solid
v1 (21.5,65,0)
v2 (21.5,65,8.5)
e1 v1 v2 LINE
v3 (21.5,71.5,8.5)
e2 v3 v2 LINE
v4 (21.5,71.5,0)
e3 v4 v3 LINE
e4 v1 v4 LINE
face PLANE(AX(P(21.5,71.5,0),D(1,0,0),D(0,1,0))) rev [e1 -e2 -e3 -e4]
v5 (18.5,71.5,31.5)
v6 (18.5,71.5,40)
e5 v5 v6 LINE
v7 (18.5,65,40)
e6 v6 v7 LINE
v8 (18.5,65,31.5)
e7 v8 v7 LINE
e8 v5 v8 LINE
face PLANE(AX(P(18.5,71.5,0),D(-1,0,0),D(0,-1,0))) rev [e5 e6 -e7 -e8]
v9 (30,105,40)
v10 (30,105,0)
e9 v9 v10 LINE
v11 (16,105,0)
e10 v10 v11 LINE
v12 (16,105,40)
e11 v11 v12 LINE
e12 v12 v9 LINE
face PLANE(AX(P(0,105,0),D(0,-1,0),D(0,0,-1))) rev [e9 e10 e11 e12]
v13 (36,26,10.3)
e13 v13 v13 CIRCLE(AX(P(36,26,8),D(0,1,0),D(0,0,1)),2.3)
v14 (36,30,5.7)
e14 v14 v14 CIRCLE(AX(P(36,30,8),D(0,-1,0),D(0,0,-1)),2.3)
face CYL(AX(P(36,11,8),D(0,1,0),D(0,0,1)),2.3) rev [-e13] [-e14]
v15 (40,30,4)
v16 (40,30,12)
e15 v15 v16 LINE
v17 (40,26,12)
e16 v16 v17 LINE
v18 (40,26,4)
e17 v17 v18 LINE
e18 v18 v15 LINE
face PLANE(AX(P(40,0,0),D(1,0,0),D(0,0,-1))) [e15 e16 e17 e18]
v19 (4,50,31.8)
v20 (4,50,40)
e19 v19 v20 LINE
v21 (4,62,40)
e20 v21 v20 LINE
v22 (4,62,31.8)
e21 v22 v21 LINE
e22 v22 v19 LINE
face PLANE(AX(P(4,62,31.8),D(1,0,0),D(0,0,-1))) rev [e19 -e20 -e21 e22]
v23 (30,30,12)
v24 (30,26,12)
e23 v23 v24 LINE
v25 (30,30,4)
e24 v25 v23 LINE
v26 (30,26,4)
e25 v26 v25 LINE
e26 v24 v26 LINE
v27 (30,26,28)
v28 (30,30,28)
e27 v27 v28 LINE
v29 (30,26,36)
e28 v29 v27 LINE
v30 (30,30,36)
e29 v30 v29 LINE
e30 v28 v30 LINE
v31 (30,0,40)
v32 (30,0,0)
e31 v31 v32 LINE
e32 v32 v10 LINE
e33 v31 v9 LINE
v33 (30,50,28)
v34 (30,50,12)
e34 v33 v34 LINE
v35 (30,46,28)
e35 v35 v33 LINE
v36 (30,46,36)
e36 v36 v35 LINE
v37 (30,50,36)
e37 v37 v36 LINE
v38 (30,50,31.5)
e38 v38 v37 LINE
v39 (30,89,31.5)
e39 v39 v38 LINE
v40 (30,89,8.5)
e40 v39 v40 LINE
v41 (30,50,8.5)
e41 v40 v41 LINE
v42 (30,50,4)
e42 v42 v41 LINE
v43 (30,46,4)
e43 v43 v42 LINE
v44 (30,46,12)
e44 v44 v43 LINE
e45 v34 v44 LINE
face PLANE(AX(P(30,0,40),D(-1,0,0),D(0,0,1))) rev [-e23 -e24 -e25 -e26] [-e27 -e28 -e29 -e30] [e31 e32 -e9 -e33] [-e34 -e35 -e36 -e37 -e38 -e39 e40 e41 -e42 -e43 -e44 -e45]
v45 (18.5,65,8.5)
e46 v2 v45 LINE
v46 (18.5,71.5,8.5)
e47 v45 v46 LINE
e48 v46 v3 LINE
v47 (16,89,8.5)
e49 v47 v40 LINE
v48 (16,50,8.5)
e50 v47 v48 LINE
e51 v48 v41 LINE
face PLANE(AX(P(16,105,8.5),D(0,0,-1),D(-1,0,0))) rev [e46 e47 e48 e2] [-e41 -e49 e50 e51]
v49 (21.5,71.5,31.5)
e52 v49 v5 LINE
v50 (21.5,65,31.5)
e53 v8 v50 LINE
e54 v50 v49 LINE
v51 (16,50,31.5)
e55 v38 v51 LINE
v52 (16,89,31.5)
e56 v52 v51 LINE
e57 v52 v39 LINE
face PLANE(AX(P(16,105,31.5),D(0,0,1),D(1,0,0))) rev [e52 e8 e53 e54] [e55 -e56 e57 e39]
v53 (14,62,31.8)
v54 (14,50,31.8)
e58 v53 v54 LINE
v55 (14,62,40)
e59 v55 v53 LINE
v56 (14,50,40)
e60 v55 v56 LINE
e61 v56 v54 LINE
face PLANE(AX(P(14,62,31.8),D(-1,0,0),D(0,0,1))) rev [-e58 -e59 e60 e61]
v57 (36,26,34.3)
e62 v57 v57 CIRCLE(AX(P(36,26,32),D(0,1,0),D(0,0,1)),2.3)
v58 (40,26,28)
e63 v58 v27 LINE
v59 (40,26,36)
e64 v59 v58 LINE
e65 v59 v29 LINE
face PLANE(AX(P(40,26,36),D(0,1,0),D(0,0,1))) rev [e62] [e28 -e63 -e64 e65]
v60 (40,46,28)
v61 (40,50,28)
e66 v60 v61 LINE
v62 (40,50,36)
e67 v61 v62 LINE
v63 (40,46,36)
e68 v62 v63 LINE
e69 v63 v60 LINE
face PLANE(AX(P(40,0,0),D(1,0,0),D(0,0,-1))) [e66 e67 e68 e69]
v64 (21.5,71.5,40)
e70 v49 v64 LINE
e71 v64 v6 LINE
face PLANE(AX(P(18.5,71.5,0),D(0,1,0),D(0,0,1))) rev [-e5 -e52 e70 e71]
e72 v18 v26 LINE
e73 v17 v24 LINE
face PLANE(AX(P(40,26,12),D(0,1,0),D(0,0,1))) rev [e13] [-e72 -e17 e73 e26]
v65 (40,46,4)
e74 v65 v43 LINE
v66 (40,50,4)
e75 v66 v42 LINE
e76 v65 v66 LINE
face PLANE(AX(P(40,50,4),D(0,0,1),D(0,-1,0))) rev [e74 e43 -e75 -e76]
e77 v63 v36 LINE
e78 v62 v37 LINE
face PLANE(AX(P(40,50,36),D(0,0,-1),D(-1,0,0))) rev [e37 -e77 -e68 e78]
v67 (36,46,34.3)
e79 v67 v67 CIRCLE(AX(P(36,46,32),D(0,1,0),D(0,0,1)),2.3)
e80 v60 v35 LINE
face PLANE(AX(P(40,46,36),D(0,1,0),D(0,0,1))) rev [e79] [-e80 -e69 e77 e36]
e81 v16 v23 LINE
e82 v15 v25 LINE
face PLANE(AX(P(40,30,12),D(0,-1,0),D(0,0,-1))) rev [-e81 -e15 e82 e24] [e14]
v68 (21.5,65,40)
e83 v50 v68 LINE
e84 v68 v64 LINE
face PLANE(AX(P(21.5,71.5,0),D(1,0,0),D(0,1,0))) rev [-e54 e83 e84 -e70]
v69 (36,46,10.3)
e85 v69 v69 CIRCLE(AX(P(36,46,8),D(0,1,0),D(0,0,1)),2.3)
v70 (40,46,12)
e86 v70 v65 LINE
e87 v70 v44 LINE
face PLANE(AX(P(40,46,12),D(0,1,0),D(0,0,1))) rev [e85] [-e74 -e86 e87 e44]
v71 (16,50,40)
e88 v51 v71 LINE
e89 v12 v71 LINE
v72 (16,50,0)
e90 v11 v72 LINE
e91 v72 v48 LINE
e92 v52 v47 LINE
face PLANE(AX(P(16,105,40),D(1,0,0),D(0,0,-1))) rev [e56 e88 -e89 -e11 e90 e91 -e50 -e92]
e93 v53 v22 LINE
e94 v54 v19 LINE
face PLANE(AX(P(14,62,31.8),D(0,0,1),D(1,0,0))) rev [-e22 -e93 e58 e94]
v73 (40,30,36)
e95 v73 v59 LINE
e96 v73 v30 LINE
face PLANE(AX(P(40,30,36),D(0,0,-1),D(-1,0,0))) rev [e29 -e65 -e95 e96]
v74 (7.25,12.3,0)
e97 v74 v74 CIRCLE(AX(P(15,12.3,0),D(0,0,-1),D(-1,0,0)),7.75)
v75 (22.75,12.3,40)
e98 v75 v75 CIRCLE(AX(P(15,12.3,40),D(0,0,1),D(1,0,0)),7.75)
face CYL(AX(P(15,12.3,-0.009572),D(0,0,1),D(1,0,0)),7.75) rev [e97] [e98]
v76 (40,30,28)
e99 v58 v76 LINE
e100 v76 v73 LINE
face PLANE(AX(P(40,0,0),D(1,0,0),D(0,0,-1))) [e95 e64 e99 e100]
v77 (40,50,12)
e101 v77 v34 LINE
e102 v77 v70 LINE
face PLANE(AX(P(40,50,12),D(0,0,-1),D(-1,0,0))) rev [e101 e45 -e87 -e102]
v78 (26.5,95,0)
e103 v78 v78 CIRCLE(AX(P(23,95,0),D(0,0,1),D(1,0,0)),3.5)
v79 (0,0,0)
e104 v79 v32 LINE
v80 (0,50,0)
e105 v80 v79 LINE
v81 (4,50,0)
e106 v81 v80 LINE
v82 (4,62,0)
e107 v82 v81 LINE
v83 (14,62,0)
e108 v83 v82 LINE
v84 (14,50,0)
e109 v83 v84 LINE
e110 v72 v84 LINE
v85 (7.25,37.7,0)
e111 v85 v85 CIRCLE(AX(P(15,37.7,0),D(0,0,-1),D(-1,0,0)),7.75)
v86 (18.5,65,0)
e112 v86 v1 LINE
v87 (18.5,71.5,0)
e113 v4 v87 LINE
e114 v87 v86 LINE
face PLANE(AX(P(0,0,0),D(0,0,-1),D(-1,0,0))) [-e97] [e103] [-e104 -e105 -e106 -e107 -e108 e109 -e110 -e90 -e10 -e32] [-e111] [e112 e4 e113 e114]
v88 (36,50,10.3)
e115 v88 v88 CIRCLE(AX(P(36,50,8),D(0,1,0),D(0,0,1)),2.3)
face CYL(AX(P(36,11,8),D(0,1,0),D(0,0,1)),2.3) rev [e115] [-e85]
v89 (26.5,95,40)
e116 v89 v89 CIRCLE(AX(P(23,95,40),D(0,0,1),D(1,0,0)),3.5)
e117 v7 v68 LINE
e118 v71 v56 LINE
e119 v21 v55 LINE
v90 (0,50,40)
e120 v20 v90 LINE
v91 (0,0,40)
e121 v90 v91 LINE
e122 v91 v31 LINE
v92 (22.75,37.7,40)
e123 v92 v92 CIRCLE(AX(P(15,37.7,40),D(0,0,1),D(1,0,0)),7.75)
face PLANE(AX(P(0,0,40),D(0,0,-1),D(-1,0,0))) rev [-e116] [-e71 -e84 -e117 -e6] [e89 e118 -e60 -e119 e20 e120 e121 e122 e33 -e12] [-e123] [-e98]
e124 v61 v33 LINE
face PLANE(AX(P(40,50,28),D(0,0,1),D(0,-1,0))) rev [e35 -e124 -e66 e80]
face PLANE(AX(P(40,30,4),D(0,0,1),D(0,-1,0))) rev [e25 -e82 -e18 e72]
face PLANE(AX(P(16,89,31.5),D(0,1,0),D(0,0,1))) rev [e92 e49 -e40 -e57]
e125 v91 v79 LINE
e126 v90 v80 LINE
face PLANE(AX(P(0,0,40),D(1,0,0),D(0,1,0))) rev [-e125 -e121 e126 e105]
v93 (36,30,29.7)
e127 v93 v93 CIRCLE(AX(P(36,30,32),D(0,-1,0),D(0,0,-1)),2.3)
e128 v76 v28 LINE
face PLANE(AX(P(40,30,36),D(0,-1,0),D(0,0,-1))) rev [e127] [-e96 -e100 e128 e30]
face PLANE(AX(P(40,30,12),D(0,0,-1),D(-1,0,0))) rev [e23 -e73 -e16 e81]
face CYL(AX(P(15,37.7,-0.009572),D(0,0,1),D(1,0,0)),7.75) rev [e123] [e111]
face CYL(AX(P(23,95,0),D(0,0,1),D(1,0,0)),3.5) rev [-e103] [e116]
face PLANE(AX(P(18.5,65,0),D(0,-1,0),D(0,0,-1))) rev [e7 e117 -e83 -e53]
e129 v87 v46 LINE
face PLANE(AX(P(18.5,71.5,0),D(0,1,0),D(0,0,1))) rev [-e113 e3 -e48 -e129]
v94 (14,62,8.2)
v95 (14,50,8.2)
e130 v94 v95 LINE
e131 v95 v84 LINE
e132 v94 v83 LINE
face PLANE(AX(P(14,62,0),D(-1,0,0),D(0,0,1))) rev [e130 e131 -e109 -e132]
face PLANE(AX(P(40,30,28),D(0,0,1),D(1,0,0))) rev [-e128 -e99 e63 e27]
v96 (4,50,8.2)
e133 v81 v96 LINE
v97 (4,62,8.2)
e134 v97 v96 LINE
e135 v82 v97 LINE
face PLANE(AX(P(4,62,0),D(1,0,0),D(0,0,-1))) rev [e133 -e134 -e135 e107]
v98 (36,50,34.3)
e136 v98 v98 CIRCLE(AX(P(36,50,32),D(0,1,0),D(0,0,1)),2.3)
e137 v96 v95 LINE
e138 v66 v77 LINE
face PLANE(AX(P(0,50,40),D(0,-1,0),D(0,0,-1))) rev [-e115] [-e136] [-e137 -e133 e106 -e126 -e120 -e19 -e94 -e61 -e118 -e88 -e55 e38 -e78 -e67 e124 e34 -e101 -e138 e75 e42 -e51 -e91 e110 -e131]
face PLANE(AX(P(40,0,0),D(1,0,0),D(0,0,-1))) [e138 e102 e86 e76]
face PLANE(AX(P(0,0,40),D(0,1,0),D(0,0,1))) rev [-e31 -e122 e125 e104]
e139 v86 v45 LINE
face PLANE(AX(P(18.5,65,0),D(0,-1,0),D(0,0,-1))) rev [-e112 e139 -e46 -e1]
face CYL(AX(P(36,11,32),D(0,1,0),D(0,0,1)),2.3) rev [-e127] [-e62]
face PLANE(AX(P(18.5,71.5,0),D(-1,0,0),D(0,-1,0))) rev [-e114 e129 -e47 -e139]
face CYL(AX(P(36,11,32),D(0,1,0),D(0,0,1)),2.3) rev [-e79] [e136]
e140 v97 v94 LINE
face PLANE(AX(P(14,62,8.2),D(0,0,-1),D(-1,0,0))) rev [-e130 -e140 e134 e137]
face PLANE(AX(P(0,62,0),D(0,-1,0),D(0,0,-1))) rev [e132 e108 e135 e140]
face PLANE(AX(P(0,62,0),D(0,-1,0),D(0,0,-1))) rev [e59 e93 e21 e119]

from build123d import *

# Parameters (mm, degrees)
ESQUISSE1_W              = 30
ESQUISSE1_H              = 50
BOSS_EXTRU_1_DEPTH       = 40
BOSS_EXTRU_3_START       = -40
BOSS_EXTRU_3_OUTLINE_R   = 7.75
BOSS_EXTRU_3_DEPTH       = 40
ESQUISSE138_W            = 14
ESQUISSE138_H            = 8.5
BOSS_EXTRU_4_DEPTH       = 55
ESQUISSE145_W            = 8
ESQUISSE145_H            = 4
BOSS_EXTRU_5_DEPTH       = 10
ESQUISSE146_R            = 2.3
ENL_V_MAT_EXTRU_13_DEPTH = 39
ESQUISSE147_W            = 3
ESQUISSE147_H            = 6.5
ENL_V_MAT_EXTRU_14_DEPTH = 40
ESQUISSE150_W            = 10
ESQUISSE150_H            = 8.2
BOSS_EXTRU_6_DEPTH       = 12
ESQUISSE154_W            = 14
ESQUISSE154_H            = 16
BOSS_EXTRU_7_DEPTH       = 23
ESQUISSE152_R            = 3.5
ENL_V_MAT_EXTRU_16_DEPTH = 40


# Read off the part's stored shape, not the designer's step: Boss.-Extru.3
with BuildPart() as part:
    # Esquisse1 → Boss.-Extru.1 (new body)
    with BuildSketch(Plane.XY):
        with Locations((15, 25)):
            Rectangle(ESQUISSE1_W, ESQUISSE1_H)
    extrude(amount=BOSS_EXTRU_1_DEPTH)

    # Boss.-Extru.3 outline → Boss.-Extru.3 (cut)
    with BuildSketch(Plane.XY.offset(40).offset(BOSS_EXTRU_3_START)):
        with Locations((15, 12.3)):
            Circle(BOSS_EXTRU_3_OUTLINE_R)
        with Locations((15, 37.7)):
            Circle(BOSS_EXTRU_3_OUTLINE_R)
    extrude(amount=BOSS_EXTRU_3_DEPTH, mode=Mode.SUBTRACT)

    # Esquisse138 → Boss.-Extru.4 (add)
    with BuildSketch(Plane(origin=(0, 50, 0), x_dir=(1, 0, 0), z_dir=(0, 1, 0))):
        with Locations((23, -35.75)):
            Rectangle(ESQUISSE138_W, ESQUISSE138_H)
        with Locations((23, -4.25)):
            Rectangle(ESQUISSE138_W, ESQUISSE138_H)
    extrude(amount=BOSS_EXTRU_4_DEPTH)

    # Esquisse145 → Boss.-Extru.5 (add)
    with BuildSketch(Plane(origin=(30, 0, 0), x_dir=(0, 0, -1), z_dir=(1, 0, 0))):
        with Locations((-32, 48)):
            Rectangle(ESQUISSE145_W, ESQUISSE145_H)
        with Locations((-8, 48)):
            Rectangle(ESQUISSE145_W, ESQUISSE145_H)
        with Locations((-32, 28)):
            Rectangle(ESQUISSE145_W, ESQUISSE145_H)
        with Locations((-8, 28)):
            Rectangle(ESQUISSE145_W, ESQUISSE145_H)
    extrude(amount=BOSS_EXTRU_5_DEPTH)

    # Esquisse146 → Enlèv. mat.-Extru.13 (cut)
    with BuildSketch(Plane(origin=(0, 50, 0), x_dir=(1, 0, 0), z_dir=(0, 1, 0))):
        with Locations(Location((36, -32, 0), (0, 0, 270))):
            Circle(ESQUISSE146_R)
        with Locations(Location((36, -8, 0), (0, 0, 270))):
            Circle(ESQUISSE146_R)
    extrude(amount=-ENL_V_MAT_EXTRU_13_DEPTH, mode=Mode.SUBTRACT)

    # Esquisse147 → Enlèv. mat.-Extru.14 (cut)
    with BuildSketch(Plane.XY.offset(40)):
        with Locations((20, 68.25)):
            Rectangle(ESQUISSE147_W, ESQUISSE147_H)
    extrude(amount=-ENL_V_MAT_EXTRU_14_DEPTH, mode=Mode.SUBTRACT)

    # Esquisse150 → Boss.-Extru.6 (add)
    with BuildSketch(Plane(origin=(0, 50, 0), x_dir=(1, 0, 0), z_dir=(0, 1, 0))):
        with Locations((9, -4.1)):
            Rectangle(ESQUISSE150_W, ESQUISSE150_H)
        with Locations((9, -35.9)):
            Rectangle(ESQUISSE150_W, ESQUISSE150_H)
    extrude(amount=BOSS_EXTRU_6_DEPTH)

    # Esquisse154 → Boss.-Extru.7 (add)
    with BuildSketch(Plane.XY.offset(8.5)):
        with Locations((23, 97)):
            Rectangle(ESQUISSE154_W, ESQUISSE154_H)
    extrude(amount=BOSS_EXTRU_7_DEPTH)

    # Esquisse152 → Enlèv. mat.-Extru.16 (cut)
    with BuildSketch(Plane.XY.offset(40)):
        with Locations((23, 95)):
            Circle(ESQUISSE152_R)
    extrude(amount=-ENL_V_MAT_EXTRU_16_DEPTH, mode=Mode.SUBTRACT)


solid = part.part
